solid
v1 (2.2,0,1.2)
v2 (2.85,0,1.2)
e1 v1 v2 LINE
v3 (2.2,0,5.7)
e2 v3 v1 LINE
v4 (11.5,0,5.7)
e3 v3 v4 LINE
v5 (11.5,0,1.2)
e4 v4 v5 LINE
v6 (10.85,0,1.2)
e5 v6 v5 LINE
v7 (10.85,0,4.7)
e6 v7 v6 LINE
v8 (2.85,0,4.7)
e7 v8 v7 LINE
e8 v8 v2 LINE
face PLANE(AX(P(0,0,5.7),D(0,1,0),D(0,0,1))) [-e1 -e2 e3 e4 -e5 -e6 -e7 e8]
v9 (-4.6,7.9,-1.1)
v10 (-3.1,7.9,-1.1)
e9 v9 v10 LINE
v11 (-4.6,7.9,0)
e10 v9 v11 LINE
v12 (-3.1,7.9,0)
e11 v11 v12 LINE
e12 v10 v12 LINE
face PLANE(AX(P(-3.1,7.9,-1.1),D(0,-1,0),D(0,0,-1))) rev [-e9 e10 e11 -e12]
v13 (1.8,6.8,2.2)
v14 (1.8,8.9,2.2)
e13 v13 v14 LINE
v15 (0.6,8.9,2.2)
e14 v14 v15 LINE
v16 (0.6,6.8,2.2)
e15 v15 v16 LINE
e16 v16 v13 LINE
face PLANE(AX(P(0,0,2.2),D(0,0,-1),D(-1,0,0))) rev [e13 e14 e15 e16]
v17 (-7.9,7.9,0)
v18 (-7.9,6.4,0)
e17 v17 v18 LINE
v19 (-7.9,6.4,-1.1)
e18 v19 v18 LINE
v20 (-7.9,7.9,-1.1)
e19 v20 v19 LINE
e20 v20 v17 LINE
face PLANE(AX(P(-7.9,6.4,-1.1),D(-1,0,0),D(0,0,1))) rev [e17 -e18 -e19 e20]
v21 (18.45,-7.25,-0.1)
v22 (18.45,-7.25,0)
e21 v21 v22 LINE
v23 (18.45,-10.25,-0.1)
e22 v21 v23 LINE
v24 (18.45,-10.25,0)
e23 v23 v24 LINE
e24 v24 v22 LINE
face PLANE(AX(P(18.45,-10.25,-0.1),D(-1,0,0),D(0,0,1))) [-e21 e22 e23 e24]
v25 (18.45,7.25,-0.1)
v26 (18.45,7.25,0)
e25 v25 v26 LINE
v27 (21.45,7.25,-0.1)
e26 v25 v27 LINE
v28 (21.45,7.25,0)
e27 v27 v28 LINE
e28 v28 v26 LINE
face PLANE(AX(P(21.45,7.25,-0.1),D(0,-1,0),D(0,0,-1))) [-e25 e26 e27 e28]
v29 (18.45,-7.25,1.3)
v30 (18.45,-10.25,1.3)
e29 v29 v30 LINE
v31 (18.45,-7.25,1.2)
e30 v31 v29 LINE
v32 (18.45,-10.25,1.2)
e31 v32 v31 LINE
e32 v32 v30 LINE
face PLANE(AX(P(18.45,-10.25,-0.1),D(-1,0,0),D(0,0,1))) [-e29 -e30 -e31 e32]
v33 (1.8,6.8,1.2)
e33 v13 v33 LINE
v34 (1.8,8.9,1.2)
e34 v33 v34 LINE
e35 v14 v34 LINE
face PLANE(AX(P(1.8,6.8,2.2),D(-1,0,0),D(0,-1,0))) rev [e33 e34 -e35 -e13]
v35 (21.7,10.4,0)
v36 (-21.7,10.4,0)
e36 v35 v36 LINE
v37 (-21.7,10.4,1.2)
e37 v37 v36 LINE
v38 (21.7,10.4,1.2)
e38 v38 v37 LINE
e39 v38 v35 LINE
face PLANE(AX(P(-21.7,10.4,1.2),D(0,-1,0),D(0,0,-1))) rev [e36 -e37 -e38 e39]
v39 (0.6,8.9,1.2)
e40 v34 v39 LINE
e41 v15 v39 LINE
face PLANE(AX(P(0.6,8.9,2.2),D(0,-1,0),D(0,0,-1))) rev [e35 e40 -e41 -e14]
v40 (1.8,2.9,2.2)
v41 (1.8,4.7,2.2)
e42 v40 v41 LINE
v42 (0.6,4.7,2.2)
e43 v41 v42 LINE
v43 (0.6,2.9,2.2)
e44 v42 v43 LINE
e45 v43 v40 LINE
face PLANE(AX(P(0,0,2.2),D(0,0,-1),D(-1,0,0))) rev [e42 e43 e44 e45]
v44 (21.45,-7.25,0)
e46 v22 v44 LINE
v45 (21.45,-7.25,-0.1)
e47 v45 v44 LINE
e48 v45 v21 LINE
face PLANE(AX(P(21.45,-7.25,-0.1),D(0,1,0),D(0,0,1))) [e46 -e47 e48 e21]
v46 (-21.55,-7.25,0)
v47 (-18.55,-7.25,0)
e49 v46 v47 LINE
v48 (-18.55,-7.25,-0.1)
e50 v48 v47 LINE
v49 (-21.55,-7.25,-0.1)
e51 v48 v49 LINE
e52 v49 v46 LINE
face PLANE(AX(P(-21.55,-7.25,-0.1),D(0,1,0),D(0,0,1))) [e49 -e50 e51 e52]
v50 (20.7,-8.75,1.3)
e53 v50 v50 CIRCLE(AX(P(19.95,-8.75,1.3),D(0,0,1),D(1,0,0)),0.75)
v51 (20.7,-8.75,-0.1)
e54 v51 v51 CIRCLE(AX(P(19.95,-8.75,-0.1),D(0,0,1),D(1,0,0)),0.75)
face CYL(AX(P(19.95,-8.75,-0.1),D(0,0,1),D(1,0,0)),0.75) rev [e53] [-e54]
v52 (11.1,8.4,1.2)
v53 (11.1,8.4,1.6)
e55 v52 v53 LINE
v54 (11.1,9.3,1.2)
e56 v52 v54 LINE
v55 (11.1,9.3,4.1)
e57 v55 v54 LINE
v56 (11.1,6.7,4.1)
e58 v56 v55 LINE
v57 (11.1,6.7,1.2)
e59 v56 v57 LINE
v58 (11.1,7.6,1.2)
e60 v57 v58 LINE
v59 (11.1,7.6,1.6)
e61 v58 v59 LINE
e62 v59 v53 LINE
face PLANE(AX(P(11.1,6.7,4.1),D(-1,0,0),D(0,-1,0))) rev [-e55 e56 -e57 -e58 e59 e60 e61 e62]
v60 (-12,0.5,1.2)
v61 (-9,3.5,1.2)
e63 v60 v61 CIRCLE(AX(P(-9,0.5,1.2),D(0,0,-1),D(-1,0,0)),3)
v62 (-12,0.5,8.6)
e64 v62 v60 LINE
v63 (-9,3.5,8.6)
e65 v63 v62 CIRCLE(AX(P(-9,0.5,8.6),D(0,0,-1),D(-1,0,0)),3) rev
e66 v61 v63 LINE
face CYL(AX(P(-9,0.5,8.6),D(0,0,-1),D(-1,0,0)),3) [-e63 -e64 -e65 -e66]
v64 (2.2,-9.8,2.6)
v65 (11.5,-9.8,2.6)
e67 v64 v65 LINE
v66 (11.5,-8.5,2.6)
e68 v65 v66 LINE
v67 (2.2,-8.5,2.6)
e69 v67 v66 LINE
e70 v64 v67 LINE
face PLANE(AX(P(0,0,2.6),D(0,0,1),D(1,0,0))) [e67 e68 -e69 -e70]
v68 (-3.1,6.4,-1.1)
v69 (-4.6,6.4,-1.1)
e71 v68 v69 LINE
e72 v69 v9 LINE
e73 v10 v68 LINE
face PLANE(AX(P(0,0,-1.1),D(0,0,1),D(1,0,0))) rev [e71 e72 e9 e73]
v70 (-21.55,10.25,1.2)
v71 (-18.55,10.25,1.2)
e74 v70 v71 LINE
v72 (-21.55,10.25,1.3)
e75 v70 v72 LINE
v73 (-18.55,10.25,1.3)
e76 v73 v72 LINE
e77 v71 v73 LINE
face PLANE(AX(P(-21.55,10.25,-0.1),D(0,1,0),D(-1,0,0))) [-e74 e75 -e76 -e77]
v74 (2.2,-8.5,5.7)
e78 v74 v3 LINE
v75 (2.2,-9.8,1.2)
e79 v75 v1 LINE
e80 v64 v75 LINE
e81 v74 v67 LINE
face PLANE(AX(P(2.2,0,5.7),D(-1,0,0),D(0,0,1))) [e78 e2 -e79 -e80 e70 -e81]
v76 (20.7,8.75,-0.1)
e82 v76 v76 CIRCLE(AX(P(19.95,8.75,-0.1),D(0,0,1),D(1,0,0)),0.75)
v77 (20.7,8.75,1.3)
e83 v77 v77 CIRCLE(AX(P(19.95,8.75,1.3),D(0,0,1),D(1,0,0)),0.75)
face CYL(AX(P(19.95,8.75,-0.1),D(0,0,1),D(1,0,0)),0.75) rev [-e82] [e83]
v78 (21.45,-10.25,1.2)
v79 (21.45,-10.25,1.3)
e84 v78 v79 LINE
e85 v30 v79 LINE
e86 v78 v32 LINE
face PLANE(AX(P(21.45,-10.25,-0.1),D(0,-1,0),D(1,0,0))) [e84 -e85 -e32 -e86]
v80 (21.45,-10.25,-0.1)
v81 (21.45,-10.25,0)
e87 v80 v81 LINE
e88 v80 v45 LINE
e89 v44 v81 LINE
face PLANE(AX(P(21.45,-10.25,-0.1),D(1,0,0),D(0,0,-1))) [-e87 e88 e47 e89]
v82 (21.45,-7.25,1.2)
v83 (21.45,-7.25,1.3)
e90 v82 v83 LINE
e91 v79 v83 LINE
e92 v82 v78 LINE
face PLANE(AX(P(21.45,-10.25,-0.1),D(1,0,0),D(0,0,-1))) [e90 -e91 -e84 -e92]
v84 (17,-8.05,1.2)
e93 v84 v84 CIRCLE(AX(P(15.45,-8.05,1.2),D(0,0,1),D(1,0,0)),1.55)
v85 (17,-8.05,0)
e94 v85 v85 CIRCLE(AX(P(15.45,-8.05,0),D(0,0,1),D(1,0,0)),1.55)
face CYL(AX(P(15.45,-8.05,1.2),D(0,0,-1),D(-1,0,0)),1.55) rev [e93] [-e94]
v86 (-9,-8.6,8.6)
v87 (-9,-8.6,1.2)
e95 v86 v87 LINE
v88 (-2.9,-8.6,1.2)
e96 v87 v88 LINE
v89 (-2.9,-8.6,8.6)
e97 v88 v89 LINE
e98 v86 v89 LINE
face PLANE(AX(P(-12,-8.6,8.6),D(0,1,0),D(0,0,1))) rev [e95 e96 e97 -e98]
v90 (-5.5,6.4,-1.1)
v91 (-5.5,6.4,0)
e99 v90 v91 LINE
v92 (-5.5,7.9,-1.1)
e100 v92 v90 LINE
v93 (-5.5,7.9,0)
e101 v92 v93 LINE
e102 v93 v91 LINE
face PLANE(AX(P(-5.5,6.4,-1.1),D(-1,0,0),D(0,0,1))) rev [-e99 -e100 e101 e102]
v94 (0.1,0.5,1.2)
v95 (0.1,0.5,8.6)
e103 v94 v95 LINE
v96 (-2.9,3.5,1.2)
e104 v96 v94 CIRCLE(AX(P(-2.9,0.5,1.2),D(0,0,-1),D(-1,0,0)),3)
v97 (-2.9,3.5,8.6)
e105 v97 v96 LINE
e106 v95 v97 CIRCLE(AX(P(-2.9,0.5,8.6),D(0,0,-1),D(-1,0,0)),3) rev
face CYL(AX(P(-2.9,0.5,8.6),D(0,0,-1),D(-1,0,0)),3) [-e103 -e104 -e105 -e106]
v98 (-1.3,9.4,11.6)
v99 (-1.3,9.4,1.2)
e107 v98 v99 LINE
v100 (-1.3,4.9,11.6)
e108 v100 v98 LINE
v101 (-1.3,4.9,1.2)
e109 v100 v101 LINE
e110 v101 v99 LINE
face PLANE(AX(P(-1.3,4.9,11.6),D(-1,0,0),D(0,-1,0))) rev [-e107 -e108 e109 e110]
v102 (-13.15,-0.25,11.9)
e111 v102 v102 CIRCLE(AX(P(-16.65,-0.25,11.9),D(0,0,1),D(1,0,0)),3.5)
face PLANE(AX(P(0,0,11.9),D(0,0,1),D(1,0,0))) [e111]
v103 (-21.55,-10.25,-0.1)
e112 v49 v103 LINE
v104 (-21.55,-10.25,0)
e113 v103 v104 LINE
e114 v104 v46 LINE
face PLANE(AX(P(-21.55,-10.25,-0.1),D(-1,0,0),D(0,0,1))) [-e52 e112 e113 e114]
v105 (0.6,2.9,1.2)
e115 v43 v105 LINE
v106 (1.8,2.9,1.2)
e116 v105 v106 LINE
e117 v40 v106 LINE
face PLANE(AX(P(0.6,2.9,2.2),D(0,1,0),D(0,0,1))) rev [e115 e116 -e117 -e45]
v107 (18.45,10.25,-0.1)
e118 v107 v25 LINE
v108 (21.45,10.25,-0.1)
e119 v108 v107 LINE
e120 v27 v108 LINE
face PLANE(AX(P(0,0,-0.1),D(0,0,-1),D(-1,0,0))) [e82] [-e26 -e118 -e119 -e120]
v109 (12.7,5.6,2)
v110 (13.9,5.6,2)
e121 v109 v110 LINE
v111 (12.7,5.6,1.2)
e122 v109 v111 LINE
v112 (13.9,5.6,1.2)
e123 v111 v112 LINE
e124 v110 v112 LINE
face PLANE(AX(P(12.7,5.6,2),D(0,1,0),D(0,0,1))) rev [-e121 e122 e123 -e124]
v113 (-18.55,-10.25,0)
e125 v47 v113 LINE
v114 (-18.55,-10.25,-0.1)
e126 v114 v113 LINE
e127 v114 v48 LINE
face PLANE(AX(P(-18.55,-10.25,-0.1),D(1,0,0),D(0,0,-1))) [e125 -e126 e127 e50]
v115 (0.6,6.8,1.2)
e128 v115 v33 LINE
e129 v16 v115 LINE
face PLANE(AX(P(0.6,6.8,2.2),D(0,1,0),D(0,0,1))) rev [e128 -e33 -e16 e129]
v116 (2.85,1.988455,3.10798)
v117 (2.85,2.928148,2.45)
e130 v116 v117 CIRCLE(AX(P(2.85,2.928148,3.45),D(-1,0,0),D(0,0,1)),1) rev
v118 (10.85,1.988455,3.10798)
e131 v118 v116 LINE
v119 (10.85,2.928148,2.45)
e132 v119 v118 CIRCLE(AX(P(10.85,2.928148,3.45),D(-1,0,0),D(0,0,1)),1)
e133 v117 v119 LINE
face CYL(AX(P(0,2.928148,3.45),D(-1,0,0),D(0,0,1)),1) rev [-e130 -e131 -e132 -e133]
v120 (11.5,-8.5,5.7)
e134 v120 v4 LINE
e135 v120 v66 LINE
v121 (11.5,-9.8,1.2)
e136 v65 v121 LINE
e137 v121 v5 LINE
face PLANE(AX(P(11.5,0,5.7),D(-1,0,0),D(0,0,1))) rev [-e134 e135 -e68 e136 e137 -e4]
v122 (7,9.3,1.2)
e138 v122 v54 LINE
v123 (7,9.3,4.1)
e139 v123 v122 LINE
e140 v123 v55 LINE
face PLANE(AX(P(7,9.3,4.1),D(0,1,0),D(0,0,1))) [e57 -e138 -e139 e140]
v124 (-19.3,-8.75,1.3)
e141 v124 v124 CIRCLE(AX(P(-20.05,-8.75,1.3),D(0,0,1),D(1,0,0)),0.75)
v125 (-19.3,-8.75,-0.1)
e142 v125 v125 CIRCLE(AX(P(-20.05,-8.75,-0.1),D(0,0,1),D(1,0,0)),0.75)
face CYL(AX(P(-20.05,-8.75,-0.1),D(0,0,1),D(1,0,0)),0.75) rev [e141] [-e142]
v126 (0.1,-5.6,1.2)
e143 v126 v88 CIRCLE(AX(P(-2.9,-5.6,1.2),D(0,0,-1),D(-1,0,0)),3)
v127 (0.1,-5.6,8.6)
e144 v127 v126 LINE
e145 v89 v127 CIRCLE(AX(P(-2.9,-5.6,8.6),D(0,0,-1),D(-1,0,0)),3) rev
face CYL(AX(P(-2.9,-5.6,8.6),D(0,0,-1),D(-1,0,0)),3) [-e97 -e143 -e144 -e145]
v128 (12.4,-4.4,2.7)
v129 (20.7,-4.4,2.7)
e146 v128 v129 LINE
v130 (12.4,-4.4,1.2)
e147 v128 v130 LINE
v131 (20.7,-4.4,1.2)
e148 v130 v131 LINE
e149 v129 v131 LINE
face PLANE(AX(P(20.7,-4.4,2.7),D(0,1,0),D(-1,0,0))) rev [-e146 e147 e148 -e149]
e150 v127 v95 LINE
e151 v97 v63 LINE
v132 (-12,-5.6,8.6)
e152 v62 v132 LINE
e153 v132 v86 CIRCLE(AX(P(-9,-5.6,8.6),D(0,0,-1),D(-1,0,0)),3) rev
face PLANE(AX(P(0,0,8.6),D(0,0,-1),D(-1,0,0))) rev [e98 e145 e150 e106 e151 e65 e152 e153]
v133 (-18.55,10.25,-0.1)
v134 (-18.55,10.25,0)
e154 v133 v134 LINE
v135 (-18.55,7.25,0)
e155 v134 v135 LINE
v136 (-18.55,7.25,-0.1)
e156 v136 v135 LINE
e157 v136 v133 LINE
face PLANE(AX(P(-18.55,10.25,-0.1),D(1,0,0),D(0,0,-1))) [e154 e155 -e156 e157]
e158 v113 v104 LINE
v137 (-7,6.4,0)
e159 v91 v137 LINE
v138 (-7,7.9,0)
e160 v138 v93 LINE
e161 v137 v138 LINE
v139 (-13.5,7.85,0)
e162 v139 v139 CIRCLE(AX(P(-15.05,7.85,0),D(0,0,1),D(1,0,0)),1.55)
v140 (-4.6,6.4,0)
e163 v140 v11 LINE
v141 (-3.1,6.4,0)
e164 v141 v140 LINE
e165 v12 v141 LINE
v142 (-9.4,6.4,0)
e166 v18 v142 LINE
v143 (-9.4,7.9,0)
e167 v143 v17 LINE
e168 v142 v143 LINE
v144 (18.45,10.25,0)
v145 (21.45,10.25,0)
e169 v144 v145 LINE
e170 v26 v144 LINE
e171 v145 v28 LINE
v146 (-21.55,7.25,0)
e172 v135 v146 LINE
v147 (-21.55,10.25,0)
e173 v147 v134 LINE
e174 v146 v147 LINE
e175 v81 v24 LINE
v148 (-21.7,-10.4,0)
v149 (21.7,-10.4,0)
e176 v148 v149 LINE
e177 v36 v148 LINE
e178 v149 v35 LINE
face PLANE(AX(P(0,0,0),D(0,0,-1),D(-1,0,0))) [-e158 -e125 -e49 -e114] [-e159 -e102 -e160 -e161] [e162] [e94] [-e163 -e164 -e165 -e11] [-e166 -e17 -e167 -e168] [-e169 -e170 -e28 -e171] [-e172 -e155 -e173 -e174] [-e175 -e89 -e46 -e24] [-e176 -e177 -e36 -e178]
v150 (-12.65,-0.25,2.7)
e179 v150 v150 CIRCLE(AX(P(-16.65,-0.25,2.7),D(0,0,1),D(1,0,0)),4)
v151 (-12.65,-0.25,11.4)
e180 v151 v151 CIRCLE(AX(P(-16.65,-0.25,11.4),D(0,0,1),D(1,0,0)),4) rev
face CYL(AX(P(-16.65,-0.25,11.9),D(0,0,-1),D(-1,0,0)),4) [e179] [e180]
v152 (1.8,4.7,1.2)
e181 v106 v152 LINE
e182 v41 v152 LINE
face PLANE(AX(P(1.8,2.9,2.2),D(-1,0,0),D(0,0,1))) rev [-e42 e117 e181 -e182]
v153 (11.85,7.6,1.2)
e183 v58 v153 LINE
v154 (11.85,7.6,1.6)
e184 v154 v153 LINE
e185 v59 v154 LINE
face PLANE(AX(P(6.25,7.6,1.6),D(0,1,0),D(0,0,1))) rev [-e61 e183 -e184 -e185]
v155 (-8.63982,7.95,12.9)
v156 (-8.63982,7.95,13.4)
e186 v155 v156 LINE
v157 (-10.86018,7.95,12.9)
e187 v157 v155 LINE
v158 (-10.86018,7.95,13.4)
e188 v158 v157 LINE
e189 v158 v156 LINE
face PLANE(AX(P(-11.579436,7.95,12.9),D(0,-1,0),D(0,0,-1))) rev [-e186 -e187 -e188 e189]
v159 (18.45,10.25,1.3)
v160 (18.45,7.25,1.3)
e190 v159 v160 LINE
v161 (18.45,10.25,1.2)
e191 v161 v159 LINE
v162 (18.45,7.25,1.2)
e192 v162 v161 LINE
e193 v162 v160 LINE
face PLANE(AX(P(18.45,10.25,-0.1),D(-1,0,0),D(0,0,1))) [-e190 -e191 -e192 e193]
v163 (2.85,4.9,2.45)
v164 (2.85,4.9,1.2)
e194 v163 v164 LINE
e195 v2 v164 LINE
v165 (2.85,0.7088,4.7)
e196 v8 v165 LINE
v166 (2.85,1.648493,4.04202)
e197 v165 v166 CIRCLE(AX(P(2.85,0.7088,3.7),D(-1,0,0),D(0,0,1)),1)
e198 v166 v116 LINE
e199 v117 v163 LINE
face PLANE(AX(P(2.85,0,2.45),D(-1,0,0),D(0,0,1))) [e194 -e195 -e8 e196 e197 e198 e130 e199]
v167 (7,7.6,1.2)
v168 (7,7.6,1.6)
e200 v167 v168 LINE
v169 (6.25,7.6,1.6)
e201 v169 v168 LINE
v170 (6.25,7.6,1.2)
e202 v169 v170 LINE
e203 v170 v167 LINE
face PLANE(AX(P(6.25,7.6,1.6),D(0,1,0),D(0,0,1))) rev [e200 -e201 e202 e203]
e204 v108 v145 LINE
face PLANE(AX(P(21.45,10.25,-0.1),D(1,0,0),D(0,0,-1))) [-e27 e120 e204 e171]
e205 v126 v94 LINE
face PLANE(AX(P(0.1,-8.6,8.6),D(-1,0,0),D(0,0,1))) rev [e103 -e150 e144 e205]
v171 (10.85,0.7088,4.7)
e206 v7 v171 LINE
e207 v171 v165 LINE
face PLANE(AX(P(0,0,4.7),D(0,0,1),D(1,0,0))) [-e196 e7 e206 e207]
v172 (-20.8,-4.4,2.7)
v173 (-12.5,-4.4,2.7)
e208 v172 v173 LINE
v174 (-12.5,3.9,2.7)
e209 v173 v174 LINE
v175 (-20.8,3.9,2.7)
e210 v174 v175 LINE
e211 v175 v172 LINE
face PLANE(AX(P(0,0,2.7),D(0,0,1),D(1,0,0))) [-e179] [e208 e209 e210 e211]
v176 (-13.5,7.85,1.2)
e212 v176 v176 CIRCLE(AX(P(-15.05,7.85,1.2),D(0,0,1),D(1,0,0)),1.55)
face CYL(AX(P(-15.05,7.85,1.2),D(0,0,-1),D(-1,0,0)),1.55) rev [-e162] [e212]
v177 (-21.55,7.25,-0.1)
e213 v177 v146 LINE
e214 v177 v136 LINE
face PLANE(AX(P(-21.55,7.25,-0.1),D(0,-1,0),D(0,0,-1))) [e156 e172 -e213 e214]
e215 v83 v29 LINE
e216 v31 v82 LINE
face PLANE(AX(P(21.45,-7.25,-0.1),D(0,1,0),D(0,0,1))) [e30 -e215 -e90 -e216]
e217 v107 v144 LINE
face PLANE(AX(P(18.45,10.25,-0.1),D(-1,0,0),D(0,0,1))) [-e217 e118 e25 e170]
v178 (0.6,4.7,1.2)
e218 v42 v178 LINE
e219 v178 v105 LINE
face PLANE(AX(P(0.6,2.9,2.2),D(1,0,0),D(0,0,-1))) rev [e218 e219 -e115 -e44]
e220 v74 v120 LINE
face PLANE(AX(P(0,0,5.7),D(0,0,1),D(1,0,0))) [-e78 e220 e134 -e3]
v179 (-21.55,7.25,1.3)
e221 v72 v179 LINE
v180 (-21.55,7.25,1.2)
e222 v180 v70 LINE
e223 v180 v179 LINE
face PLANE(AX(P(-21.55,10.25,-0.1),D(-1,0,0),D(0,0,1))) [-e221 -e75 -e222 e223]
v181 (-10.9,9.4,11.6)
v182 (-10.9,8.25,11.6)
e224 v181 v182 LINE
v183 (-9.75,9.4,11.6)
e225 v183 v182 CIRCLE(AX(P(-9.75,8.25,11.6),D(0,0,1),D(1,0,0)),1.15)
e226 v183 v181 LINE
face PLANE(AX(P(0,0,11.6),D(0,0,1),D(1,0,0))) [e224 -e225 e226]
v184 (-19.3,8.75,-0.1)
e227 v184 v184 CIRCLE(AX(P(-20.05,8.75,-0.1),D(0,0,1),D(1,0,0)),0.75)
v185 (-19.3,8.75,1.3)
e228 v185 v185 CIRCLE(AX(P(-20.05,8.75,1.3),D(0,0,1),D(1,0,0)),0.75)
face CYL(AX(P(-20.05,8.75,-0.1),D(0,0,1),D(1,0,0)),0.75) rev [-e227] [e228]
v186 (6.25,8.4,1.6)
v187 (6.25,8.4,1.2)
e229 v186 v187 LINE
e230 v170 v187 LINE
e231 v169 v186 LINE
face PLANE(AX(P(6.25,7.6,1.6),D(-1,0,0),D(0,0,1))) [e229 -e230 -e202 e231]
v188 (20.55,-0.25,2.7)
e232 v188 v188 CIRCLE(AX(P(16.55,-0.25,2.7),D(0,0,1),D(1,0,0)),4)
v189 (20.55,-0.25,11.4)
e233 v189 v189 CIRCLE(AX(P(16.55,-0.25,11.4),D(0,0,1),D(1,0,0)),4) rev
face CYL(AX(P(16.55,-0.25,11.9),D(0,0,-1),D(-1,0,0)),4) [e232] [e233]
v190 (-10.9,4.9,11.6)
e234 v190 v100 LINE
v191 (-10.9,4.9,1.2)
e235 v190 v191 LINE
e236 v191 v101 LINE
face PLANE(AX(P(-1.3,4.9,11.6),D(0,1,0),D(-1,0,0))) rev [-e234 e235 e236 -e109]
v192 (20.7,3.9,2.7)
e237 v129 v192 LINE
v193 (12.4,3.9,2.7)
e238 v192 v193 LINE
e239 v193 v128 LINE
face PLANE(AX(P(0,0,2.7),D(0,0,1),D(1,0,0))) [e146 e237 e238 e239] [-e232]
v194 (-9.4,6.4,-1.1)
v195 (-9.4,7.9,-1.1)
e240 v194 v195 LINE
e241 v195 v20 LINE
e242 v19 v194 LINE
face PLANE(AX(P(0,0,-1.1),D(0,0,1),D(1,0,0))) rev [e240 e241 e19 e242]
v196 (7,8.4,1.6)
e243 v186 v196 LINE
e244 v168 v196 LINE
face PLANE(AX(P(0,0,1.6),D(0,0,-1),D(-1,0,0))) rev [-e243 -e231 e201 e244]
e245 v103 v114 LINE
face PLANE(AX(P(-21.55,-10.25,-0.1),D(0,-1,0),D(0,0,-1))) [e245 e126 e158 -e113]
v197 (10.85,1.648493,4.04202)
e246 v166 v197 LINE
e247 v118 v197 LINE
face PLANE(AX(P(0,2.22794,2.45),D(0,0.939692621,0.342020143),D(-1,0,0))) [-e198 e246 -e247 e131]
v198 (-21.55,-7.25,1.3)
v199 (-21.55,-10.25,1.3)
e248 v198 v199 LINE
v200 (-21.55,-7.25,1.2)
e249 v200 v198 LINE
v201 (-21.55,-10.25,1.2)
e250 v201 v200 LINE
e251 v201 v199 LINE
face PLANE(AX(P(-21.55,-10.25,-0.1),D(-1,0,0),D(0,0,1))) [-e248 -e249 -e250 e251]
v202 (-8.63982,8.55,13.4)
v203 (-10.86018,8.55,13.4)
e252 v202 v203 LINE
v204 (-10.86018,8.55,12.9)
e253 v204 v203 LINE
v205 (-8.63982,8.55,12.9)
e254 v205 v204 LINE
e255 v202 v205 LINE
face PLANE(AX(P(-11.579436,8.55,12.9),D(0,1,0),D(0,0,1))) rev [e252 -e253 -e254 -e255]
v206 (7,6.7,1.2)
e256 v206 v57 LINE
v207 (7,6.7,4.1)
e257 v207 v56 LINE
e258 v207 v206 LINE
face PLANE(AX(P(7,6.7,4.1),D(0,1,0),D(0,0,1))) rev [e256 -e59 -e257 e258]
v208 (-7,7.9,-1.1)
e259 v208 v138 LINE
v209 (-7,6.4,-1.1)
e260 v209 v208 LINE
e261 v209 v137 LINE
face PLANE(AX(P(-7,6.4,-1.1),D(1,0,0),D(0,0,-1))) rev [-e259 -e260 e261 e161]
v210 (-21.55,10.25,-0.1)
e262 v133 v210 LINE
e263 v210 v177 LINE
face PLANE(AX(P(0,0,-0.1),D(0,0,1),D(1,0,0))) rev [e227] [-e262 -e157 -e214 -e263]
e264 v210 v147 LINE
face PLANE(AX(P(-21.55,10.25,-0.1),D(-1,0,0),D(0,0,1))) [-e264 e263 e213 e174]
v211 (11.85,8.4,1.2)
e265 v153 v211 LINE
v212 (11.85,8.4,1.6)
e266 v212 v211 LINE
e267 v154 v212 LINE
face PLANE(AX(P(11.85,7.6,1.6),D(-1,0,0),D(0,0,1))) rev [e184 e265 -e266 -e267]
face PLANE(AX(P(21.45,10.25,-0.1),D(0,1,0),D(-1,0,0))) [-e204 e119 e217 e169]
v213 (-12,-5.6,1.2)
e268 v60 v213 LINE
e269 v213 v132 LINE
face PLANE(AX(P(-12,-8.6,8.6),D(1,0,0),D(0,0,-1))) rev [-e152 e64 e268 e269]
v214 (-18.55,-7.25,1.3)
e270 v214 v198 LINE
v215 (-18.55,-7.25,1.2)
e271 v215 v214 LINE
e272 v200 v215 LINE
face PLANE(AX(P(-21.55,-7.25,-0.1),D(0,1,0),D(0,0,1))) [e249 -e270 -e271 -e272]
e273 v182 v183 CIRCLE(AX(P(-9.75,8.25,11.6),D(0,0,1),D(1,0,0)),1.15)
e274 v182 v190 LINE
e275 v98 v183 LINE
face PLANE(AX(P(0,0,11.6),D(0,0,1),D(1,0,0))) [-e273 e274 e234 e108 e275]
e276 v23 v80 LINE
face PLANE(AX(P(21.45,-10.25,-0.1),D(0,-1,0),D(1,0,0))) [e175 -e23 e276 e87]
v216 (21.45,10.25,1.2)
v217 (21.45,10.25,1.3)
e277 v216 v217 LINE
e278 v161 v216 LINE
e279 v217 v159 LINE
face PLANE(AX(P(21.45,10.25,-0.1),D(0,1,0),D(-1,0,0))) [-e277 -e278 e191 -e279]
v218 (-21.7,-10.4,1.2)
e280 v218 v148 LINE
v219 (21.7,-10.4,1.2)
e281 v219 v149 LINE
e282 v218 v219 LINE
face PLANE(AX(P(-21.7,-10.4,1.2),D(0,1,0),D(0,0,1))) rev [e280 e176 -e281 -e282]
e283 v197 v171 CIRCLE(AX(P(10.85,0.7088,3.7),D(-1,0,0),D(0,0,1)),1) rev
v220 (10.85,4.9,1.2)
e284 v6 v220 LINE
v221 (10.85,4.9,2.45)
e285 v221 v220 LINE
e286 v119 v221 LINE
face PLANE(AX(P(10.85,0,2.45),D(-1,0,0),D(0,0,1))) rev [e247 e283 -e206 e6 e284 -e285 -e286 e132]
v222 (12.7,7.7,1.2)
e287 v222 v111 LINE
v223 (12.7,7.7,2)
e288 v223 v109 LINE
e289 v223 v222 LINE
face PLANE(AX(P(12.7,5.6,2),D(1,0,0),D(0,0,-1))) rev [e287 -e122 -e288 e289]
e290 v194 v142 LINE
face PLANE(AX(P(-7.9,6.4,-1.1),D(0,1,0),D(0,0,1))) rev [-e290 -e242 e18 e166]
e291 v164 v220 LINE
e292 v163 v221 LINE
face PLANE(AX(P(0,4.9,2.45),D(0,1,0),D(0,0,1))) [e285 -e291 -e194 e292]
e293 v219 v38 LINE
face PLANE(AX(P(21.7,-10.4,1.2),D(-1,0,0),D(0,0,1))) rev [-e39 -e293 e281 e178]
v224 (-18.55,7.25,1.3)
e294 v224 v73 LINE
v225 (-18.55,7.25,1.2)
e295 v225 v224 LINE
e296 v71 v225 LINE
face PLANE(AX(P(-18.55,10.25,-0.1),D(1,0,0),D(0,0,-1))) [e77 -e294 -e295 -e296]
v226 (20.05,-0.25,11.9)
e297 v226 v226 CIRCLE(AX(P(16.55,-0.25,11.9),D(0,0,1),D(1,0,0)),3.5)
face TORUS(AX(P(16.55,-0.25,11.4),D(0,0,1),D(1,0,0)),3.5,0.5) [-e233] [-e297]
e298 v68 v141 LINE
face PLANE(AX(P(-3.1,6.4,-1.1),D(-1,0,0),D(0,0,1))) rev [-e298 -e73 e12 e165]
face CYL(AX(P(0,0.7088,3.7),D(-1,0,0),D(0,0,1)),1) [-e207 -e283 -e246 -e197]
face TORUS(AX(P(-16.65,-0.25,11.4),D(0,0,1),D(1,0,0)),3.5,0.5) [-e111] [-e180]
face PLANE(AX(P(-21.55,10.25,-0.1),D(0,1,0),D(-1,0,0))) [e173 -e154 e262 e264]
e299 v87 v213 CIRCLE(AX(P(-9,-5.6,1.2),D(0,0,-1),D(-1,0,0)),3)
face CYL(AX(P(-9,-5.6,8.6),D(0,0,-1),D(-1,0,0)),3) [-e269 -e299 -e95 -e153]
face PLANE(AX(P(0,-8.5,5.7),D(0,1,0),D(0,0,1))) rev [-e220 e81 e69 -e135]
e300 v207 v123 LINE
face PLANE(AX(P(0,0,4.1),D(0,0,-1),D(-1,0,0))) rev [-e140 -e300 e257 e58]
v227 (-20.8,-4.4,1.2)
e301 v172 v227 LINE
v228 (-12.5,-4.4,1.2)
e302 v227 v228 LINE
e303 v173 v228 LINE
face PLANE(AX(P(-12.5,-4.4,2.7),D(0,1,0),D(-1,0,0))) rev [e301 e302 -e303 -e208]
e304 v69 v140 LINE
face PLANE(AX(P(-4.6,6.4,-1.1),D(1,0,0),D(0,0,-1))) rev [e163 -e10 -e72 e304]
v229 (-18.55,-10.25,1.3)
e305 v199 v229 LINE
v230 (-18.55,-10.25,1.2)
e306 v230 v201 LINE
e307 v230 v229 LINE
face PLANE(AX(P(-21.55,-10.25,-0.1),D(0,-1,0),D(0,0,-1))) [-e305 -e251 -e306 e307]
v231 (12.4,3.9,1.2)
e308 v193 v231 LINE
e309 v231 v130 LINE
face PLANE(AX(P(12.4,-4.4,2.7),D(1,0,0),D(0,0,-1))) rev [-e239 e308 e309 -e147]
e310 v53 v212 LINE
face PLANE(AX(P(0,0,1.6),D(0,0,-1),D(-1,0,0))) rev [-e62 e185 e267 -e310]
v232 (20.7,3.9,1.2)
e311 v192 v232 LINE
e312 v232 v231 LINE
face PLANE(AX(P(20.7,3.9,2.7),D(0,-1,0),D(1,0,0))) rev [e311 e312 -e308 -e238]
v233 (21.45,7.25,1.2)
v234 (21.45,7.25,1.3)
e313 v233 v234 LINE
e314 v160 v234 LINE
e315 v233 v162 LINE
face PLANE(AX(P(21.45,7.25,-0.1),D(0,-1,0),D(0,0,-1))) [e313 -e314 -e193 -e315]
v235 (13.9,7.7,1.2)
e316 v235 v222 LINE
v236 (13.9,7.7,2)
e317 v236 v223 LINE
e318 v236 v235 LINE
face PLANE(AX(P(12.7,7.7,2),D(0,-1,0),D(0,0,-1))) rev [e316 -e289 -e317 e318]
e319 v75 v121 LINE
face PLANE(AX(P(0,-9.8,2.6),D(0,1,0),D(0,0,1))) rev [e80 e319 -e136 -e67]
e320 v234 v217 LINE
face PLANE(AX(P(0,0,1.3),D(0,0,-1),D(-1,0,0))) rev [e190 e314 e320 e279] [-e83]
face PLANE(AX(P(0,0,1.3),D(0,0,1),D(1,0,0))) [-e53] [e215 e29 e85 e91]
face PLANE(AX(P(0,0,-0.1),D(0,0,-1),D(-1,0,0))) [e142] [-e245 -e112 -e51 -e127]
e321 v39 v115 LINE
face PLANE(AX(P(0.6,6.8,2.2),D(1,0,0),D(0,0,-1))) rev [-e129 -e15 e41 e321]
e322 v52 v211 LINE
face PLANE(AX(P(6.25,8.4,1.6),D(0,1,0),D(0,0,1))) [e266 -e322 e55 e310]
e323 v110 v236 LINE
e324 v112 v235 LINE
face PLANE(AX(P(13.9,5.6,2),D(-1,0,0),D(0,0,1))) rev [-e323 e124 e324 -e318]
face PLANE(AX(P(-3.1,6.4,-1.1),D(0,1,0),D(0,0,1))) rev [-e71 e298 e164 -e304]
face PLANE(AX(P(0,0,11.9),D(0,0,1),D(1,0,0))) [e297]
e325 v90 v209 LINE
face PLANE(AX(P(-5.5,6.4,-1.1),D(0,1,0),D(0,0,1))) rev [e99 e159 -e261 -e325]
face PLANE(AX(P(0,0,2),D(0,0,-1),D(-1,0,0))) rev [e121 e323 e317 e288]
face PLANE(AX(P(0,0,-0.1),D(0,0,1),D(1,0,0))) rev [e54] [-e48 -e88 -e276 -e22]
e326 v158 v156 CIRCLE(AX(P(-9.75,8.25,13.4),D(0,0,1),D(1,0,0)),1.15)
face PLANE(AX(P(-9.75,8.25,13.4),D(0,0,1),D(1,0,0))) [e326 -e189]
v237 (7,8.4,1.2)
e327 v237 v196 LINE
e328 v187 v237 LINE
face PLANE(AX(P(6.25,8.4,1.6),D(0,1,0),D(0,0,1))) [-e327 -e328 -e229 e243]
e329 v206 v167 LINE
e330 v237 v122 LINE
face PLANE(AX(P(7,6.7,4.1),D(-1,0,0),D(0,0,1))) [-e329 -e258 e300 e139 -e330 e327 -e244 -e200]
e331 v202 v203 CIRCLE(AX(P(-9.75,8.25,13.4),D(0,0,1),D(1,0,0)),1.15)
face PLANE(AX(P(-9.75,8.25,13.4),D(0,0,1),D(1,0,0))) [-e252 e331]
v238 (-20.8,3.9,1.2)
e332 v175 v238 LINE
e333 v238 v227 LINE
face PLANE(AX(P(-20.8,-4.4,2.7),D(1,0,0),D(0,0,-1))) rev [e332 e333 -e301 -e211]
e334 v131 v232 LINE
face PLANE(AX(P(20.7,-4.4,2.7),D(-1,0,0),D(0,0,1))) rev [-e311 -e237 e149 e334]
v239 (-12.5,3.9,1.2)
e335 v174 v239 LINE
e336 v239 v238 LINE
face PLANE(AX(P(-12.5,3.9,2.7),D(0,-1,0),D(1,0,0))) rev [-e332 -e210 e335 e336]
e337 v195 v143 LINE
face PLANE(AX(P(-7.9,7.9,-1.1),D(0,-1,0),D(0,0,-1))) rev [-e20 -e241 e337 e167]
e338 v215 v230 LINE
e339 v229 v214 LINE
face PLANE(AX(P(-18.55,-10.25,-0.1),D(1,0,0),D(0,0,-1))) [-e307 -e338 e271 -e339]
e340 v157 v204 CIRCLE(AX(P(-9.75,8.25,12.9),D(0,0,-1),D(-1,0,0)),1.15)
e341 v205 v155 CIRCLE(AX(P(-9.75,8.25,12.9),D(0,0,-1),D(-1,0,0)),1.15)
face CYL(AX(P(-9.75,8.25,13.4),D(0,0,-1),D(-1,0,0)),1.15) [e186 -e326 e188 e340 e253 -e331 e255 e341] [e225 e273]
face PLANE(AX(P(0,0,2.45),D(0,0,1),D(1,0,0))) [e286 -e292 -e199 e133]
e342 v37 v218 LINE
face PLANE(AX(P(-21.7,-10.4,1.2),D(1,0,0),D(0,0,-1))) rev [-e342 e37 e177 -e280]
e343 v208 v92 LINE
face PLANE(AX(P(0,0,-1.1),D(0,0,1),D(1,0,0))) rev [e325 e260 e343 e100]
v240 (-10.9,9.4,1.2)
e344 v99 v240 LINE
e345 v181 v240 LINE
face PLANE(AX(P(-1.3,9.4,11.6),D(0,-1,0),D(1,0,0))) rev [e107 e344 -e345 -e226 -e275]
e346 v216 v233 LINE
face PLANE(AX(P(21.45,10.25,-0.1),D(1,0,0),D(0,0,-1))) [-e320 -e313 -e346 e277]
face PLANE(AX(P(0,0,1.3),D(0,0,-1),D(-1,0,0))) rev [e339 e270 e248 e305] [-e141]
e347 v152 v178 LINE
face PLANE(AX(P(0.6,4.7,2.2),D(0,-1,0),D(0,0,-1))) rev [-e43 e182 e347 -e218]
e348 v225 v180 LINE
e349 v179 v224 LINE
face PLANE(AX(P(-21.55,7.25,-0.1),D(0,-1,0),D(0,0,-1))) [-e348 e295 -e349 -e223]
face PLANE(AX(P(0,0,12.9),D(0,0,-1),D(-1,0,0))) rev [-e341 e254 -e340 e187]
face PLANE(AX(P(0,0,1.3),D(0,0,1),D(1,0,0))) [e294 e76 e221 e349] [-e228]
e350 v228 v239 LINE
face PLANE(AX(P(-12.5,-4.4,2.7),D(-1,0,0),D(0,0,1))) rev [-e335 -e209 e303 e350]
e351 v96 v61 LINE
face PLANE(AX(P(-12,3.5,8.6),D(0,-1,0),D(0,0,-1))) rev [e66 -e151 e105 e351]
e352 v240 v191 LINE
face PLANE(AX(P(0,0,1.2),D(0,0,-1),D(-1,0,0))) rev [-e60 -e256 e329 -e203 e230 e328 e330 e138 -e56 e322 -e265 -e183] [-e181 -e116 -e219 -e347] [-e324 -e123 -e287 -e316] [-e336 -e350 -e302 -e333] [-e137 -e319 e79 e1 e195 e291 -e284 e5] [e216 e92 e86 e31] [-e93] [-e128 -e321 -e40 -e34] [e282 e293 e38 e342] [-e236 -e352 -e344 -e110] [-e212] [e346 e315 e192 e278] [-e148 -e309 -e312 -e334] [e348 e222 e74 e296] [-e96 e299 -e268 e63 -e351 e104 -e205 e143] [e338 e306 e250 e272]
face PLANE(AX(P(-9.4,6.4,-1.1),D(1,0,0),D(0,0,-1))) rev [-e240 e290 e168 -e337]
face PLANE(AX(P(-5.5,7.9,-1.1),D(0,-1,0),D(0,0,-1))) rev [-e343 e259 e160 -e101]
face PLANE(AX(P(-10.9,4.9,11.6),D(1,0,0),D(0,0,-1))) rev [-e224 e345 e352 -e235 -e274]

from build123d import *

# Parameters (mm, degrees)
SKICA1_W                      = 43.4
SKICA1_H                      = 20.8
SKICA1_R                      = 1.55
P_IDAT_VYSUNUT_M1_DEPTH       = 1.2
SKICA3_W                      = 12.1
SKICA3_H                      = 12.1
P_IDAT_VYSUNUT_M2_DEPTH       = 7.4
ZAOBLIT1_R                    = 3
SKICA4_W                      = 9.6
SKICA4_H                      = 4.5
P_IDAT_VYSUNUT_M3_DEPTH       = 10.4
SKICA5_R                      = 1.15
P_IDAT_VYSUNUT_M4_DEPTH       = 1.8
SKICA6_W                      = 8.3
SKICA6_H                      = 8.3
SKICA6_R                      = 4
P_IDAT_VYSUNUT_M5_DEPTH       = 1.5
SKICA6_2_R                    = 4
P_IDAT_VYSUNUT_M6_DEPTH       = 10.7
ZAOBLIT2_R                    = 0.5
SKICA7_W                      = 9.3
SKICA7_H                      = 8.5
P_IDAT_VYSUNUT_M7_DEPTH       = 4.5
SKICA7_3_W                    = 9.3
SKICA7_3_H                    = 1.3
P_IDAT_VYSUNUT_M8_DEPTH       = 1.4
SKICA7_4_W                    = 8
SKICA7_4_H                    = 3.4
P_IDAT_VYSUNUT_M9_DEPTH       = 1.25
SKICA7_5_W                    = 8
SKICA7_5_H                    = 1.5
P_IDAT_VYSUNUT_M10_DEPTH      = 3.5
ZKOSEN_1_SIZE                 = 2
ZKOSEN_1_SIZE2                = 0.727940469
ZAOBLIT3_R                    = 1
ZAOBLIT4_R                    = 1
ZAOBLIT5_R                    = 1
SKICA8_W                      = 5.6
SKICA8_H                      = 0.8
P_IDAT_VYSUNUT_M11_DEPTH      = 0.4
SKICA8_3_W                    = 4.1
SKICA8_3_H                    = 2.6
P_IDAT_VYSUNUT_M12_DEPTH      = 2.9
SKICA9_W                      = 1.2
SKICA9_H                      = 1.8
SKICA9_H_2                    = 2.1
P_IDAT_VYSUNUT_M13_DEPTH      = 1
SKICA10_W                     = 1.2
SKICA10_H                     = 2.1
P_IDAT_VYSUNUT_M14_DEPTH      = 0.8
P_IDAT_VYSUNUT_M15_DEPTH      = 0.1
P_IDAT_VYSUNUT_M15_DEPTH_BACK = 1.3
SKICA11_W                     = 3
SKICA11_H                     = 3
SKICA11_R                     = 0.75
SKICA11_2_R                   = 0.75
ODEBRAT_VYSUNUT_M1_DEPTH      = 27.979436614
SKICA12_W                     = 3.658871704
SKICA12_H                     = 0.6
ODEBRAT_VYSUNUT_M2_DEPTH      = 0.5
SKICA13_W                     = 1.5
SKICA13_H                     = 1.5
P_IDAT_VYSUNUT_M16_DEPTH      = 1.1


with BuildPart() as part:
    # Skica1 → Přidat vysunutím1 (new body)
    with BuildSketch(Plane.XY):
        Rectangle(SKICA1_W, SKICA1_H)
        with Locations((-15.05, 7.85)):
            Circle(SKICA1_R, mode=Mode.SUBTRACT)
        with Locations((15.45, -8.05)):
            Circle(SKICA1_R, mode=Mode.SUBTRACT)
    extrude(amount=P_IDAT_VYSUNUT_M1_DEPTH)

    # Skica3 → Přidat vysunutím2 (add)
    with BuildSketch(Plane.XY.offset(1.2)):
        with Locations((-5.95, -2.55)):
            Rectangle(SKICA3_W, SKICA3_H)
    extrude(amount=P_IDAT_VYSUNUT_M2_DEPTH)

    # Zaoblit1
    zaoblit1_edges = [part.edges().sort_by_distance(p)[0] for p in [
        (0.1, -8.6, 4.9),
        (0.1, 3.5, 4.9),
        (-12, 3.5, 4.9),
        (-12, -8.6, 4.9),
    ]]
    fillet(zaoblit1_edges, radius=ZAOBLIT1_R)

    # Skica4 → Přidat vysunutím3 (add)
    with BuildSketch(Plane.XY.offset(1.2)):
        with Locations((-6.1, 7.15)):
            Rectangle(SKICA4_W, SKICA4_H)
    extrude(amount=P_IDAT_VYSUNUT_M3_DEPTH)

    # Skica5 → Přidat vysunutím4 (add)
    with BuildSketch(Plane.XY.offset(11.6)):
        with Locations(Location((-9.75, 8.25, 0), (0, 0, 180))):
            Circle(SKICA5_R)
    extrude(amount=P_IDAT_VYSUNUT_M4_DEPTH)

    # Skica6 → Přidat vysunutím5 (add)
    # profile 1 of 2: a face of its own
    with BuildSketch(Plane.XY.offset(1.2)):
        with Locations((-16.65, -0.25)):
            Rectangle(SKICA6_W, SKICA6_H)
        with Locations((-16.65, -0.25)):
            Circle(SKICA6_R, mode=Mode.SUBTRACT)
    # profile 2 of 2: a face of its own
    with BuildSketch(Plane.XY.offset(1.2)):
        with Locations((16.55, -0.25)):
            Rectangle(SKICA6_W, SKICA6_H)
        with Locations((16.55, -0.25)):
            Circle(SKICA6_R, mode=Mode.SUBTRACT)
    extrude(amount=P_IDAT_VYSUNUT_M5_DEPTH)

    # Skica6<2> → Přidat vysunutím6 (add)
    with BuildSketch(Plane.XY.offset(1.2)):
        with Locations((-16.65, -0.25)):
            Circle(SKICA6_2_R)
        with Locations((16.55, -0.25)):
            Circle(SKICA6_2_R)
    extrude(amount=P_IDAT_VYSUNUT_M6_DEPTH)

    # Zaoblit2
    zaoblit2_edges = [part.edges().sort_by_distance(p)[0] for p in [
        (-20.65, -0.25, 11.9),
        (12.55, -0.25, 11.9),
    ]]
    fillet(zaoblit2_edges, radius=ZAOBLIT2_R)

    # Skica7 → Přidat vysunutím7 (add)
    with BuildSketch(Plane.XY.offset(1.2)):
        with Locations((6.85, -4.25)):
            Rectangle(SKICA7_W, SKICA7_H)
    extrude(amount=P_IDAT_VYSUNUT_M7_DEPTH)

    # Skica7<3> → Přidat vysunutím8 (add)
    with BuildSketch(Plane.XY.offset(1.2)):
        with Locations((6.85, -9.15)):
            Rectangle(SKICA7_3_W, SKICA7_3_H)
    extrude(amount=P_IDAT_VYSUNUT_M8_DEPTH)

    # Skica7<4> → Přidat vysunutím9 (add)
    with BuildSketch(Plane.XY.offset(1.2)):
        with Locations((6.85, 3.2)):
            Rectangle(SKICA7_4_W, SKICA7_4_H)
    extrude(amount=P_IDAT_VYSUNUT_M9_DEPTH)

    # Skica7<5> → Přidat vysunutím10 (add)
    with BuildSketch(Plane.XY.offset(1.2)):
        with Locations((6.85, 0.75)):
            Rectangle(SKICA7_5_W, SKICA7_5_H)
    extrude(amount=P_IDAT_VYSUNUT_M10_DEPTH)

    # Zkosení1
    zkosen_1_edges = [part.edges().sort_by_distance(p)[0] for p in [
        (6.85, 1.5, 2.45),
    ]]
    zkosen_1_side = [part.faces().sort_by_distance(p)[0] for p in [
        (6.85, 1.5, 3.575),
    ]]
    chamfer(zkosen_1_edges, length=ZKOSEN_1_SIZE, length2=ZKOSEN_1_SIZE2, reference=zkosen_1_side[0])

    # Zaoblit3
    # the kernel refuses this fillet: 1 mm, written as the material it takes off along each edge
    with BuildSketch(Plane(origin=(12.503594569, 1.5, 4.7), x_dir=(0, 0, -1), z_dir=(-1, 0, 0))) as zaoblit3_piece_1:
        with BuildLine():
            CenterArc((1, 0.661437828), ZAOBLIT3_R, 180, 41.409622109)
            Line((0, 0.661437828), (-0.02, 0.661437828))
            Line((-0.02, 0.661437828), (-0.02, 0))
            Line((-0.02, 0), (0, -0.02))
            ThreePointArc((0, -0.02), (0.125, -0.02), (0.235, -0.013228757))
            Line((0.235, -0.013228757), (0.25, 0))
        make_face()
    extrude(amount=11.307189139, mode=Mode.SUBTRACT)

    # Zaoblit4
    # the kernel refuses this fillet: 1 mm, written as the material it takes off along each edge
    with BuildSketch(Plane(origin=(0.775606123, 1.5, 4.45), x_dir=(0, -0.953531662347256, 0.30129282915675026), z_dir=(1, 0, 0))) as zaoblit4_piece_1:
        with BuildLine():
            CenterArc((0.528464722, 0.953531662), ZAOBLIT4_R, 217.535269991, 70)
            Line((-0.264513729, 0.344281978), (-0.343811574, 0.28335701))
            Line((-0.343811574, 0.28335701), (-0.079297845, -0.060924968))
            Line((-0.079297845, -0.060924968), (-0.040473229, -0.091443522))
            ThreePointArc((-0.040473229, -0.091443522), (0.736154402, -0.134449607), (0.859886834, -0.095353166))
            Line((0.859886834, -0.095353166), (0.829757551, 0))
        make_face()
    extrude(amount=10.074393877, mode=Mode.SUBTRACT)

    # Zaoblit5
    zaoblit5_edges = [part.edges().sort_by_distance(p)[0] for p in [
        (6.85, 2.227940469, 2.45),
    ]]
    fillet(zaoblit5_edges, radius=ZAOBLIT5_R)

    # Skica8 → Přidat vysunutím11 (add)
    with BuildSketch(Plane.XY.offset(1.2)):
        with Locations((9.05, 8)):
            Rectangle(SKICA8_W, SKICA8_H)
    extrude(amount=P_IDAT_VYSUNUT_M11_DEPTH)

    # Skica8<3> → Přidat vysunutím12 (add)
    with BuildSketch(Plane.XY.offset(1.2)):
        with Locations((9.05, 8)):
            Rectangle(SKICA8_3_W, SKICA8_3_H)
    extrude(amount=P_IDAT_VYSUNUT_M12_DEPTH)

    # Skica9 → Přidat vysunutím13 (add)
    with BuildSketch(Plane.XY.offset(1.2)):
        with Locations((1.2, 3.8)):
            Rectangle(SKICA9_W, SKICA9_H)
        with Locations((1.2, 7.85)):
            Rectangle(SKICA9_W, SKICA9_H_2)
    extrude(amount=P_IDAT_VYSUNUT_M13_DEPTH)

    # Skica10 → Přidat vysunutím14 (add)
    with BuildSketch(Plane.XY.offset(1.2)):
        with Locations((13.3, 6.65)):
            Rectangle(SKICA10_W, SKICA10_H)
    extrude(amount=P_IDAT_VYSUNUT_M14_DEPTH)

    # Skica11 → Přidat vysunutím15 (add, two sides: drawn at the far end of the back side and taken through both)
    # profile 1 of 4: a face of its own
    with BuildSketch(Plane.XY.offset(1.2).offset(-P_IDAT_VYSUNUT_M15_DEPTH_BACK)):
        with Locations((19.95, -8.75)):
            Rectangle(SKICA11_W, SKICA11_H)
        with Locations((19.95, -8.75)):
            Circle(SKICA11_R, mode=Mode.SUBTRACT)
    # profile 2 of 4: a face of its own
    with BuildSketch(Plane.XY.offset(1.2).offset(-P_IDAT_VYSUNUT_M15_DEPTH_BACK)):
        with Locations((19.95, 8.75)):
            Rectangle(SKICA11_W, SKICA11_H)
        with Locations((19.95, 8.75)):
            Circle(SKICA11_R, mode=Mode.SUBTRACT)
    # profile 3 of 4: a face of its own
    with BuildSketch(Plane.XY.offset(1.2).offset(-P_IDAT_VYSUNUT_M15_DEPTH_BACK)):
        with Locations((-20.05, -8.75)):
            Rectangle(SKICA11_W, SKICA11_H)
        with Locations((-20.05, -8.75)):
            Circle(SKICA11_R, mode=Mode.SUBTRACT)
    # profile 4 of 4: a face of its own
    with BuildSketch(Plane.XY.offset(1.2).offset(-P_IDAT_VYSUNUT_M15_DEPTH_BACK)):
        with Locations((-20.05, 8.75)):
            Rectangle(SKICA11_W, SKICA11_H)
        with Locations((-20.05, 8.75)):
            Circle(SKICA11_R, mode=Mode.SUBTRACT)
    extrude(amount=P_IDAT_VYSUNUT_M15_DEPTH + P_IDAT_VYSUNUT_M15_DEPTH_BACK)

    # Skica11<2> → Odebrat vysunutím1 (cut, through all)
    with BuildSketch(Plane.XY.offset(1.2)):
        with Locations((-20.05, 8.75)):
            Circle(SKICA11_2_R)
        with Locations((-20.05, -8.75)):
            Circle(SKICA11_2_R)
        with Locations((19.95, 8.75)):
            Circle(SKICA11_2_R)
        with Locations((19.95, -8.75)):
            Circle(SKICA11_2_R)
    extrude(amount=-ODEBRAT_VYSUNUT_M1_DEPTH, mode=Mode.SUBTRACT)

    # Skica12 → Odebrat vysunutím2 (cut)
    with BuildSketch(Plane.XY.offset(13.4)):
        with Locations((-9.75, 8.25)):
            Rectangle(SKICA12_W, SKICA12_H)
    extrude(amount=-ODEBRAT_VYSUNUT_M2_DEPTH, mode=Mode.SUBTRACT)

    # Skica13 → Přidat vysunutím16 (add)
    with BuildSketch(Plane(origin=(0, 0, 0), x_dir=(-1, 0, 0), z_dir=(0, 0, -1))):
        with Locations((3.85, 7.15)):
            Rectangle(SKICA13_W, SKICA13_H)
        with Locations((6.25, 7.15)):
            Rectangle(SKICA13_W, SKICA13_H)
        with Locations((8.65, 7.15)):
            Rectangle(SKICA13_W, SKICA13_H)
    extrude(amount=P_IDAT_VYSUNUT_M16_DEPTH)


solid = part.part
